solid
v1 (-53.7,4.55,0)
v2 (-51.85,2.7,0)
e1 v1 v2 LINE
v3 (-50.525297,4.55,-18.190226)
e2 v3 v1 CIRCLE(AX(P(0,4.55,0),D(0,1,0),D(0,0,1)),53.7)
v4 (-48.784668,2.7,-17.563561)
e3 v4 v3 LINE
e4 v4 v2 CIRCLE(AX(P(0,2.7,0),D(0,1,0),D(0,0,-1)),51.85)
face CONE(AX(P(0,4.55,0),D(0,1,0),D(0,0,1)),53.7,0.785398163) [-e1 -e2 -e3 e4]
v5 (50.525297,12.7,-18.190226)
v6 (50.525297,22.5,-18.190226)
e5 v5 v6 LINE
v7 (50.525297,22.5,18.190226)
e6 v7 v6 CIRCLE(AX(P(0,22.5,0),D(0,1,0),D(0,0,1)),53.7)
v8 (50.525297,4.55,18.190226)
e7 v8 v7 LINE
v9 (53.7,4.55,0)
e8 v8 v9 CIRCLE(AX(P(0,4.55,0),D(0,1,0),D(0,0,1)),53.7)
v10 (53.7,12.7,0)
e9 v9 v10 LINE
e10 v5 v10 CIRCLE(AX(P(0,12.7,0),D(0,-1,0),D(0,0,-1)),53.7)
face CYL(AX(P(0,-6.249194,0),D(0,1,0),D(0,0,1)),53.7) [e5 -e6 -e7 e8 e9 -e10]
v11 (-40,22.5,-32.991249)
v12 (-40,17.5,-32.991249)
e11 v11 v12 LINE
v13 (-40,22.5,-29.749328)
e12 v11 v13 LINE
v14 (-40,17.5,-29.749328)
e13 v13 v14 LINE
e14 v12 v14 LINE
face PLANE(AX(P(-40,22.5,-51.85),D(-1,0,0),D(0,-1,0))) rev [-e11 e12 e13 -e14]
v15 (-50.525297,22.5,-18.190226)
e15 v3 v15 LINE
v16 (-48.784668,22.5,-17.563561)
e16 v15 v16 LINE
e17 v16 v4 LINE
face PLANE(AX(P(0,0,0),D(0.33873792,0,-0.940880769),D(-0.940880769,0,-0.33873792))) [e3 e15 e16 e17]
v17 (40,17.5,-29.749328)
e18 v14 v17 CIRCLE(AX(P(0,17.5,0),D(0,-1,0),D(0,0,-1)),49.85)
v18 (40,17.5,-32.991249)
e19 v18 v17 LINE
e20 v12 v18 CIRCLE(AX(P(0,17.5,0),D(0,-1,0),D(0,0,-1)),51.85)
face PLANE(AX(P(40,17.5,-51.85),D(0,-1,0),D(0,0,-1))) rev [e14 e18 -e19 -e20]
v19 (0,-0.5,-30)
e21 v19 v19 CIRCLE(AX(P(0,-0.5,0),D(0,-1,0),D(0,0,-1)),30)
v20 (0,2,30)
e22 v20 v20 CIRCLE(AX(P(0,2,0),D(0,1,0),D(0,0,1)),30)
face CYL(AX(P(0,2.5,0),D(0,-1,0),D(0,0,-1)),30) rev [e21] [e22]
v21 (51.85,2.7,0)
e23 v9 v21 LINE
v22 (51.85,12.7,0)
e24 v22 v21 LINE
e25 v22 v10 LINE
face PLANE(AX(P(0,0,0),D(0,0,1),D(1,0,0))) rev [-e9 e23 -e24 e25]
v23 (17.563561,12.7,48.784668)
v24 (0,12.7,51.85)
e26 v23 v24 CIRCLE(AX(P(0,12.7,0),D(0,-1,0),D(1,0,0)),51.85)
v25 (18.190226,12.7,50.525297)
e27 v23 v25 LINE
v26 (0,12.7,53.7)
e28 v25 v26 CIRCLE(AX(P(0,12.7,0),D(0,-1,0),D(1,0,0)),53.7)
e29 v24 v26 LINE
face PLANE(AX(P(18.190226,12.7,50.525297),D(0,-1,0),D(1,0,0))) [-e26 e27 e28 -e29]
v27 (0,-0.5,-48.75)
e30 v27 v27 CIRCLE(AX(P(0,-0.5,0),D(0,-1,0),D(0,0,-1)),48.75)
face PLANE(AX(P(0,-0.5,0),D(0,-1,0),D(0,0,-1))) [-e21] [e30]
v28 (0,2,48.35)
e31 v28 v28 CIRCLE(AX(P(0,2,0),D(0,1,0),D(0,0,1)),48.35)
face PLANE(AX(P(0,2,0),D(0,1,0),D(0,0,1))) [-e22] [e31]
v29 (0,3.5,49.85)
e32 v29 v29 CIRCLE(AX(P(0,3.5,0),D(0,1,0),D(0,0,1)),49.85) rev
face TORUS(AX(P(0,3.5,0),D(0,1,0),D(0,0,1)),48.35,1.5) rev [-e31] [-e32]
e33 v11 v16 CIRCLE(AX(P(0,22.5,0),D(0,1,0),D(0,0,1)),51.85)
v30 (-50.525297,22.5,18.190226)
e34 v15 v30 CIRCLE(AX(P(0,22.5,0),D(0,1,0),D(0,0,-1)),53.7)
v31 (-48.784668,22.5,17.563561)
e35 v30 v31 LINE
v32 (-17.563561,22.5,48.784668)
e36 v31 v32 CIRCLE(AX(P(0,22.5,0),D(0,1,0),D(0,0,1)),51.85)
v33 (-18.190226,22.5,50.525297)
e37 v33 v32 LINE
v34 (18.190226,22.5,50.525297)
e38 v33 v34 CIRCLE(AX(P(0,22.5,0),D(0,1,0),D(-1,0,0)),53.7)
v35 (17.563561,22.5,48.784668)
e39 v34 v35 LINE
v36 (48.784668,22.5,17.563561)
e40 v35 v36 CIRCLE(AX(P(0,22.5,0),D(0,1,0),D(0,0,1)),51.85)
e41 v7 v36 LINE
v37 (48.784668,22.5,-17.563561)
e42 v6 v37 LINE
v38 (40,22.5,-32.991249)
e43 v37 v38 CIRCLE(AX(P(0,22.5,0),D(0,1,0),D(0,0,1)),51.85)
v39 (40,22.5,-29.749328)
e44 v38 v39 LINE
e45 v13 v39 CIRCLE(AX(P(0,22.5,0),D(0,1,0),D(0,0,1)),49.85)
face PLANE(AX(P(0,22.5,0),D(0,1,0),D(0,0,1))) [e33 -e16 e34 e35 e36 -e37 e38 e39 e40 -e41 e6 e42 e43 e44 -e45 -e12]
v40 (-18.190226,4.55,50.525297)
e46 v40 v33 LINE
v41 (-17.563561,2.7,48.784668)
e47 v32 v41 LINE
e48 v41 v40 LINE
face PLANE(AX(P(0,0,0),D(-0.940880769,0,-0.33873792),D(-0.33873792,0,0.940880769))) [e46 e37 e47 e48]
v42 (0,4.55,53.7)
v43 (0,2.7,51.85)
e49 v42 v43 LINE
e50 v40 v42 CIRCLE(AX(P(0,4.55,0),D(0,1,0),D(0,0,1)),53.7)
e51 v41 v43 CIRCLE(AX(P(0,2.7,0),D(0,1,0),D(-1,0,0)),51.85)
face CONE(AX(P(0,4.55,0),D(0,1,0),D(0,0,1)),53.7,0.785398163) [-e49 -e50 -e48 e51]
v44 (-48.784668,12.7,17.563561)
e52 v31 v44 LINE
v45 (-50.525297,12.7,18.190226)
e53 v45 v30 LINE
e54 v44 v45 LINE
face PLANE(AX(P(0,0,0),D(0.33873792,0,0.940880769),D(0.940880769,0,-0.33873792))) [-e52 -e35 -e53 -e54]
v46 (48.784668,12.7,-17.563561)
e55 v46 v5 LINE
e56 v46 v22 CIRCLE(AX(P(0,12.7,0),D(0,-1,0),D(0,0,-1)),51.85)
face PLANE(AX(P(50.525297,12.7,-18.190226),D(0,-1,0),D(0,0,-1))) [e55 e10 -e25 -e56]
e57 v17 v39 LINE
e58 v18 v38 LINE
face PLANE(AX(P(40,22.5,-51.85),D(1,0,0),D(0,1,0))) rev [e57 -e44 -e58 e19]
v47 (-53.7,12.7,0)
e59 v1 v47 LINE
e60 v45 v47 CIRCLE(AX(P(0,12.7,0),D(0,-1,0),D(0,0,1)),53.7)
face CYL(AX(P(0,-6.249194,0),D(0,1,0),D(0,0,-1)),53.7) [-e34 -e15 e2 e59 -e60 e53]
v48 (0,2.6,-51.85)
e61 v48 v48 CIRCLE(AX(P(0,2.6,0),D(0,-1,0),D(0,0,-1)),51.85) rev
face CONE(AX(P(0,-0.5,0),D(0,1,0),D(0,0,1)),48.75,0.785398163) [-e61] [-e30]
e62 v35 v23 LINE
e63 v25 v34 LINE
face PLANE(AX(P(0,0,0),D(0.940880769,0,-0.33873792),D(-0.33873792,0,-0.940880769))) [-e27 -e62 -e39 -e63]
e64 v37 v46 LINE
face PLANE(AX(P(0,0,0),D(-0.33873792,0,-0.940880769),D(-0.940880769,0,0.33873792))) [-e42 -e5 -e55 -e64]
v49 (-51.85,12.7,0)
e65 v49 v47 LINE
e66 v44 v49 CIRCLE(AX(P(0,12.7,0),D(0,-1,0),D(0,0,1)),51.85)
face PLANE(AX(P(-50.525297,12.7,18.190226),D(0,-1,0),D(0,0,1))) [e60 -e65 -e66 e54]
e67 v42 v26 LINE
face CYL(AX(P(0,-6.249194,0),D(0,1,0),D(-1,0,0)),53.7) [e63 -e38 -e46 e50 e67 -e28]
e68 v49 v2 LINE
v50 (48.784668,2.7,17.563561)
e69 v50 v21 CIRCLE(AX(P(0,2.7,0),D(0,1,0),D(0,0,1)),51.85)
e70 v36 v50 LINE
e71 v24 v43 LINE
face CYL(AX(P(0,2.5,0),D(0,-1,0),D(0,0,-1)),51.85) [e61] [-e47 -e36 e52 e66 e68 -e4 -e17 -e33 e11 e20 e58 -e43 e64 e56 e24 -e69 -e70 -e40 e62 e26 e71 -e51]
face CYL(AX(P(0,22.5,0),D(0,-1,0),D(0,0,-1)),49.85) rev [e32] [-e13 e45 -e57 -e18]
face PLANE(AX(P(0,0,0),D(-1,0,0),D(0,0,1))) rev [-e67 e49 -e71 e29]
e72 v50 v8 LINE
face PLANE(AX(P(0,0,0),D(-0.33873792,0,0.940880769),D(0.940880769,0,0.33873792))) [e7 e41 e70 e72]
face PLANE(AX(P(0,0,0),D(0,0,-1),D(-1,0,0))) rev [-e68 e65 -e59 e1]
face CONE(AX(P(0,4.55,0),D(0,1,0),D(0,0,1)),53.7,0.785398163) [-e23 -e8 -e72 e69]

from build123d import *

# Parameters (mm, degrees)
SKETCH1_R           = 51.85
SKETCH1_R_2         = 30
BOSS_EXTRUDE1_DEPTH = 2.5
SKETCH2_R           = 51.85
SKETCH2_R_2         = 49.85
BOSS_EXTRUDE2_DEPTH = 20
SKETCH3_W           = 1.85
SKETCH3_H           = 19.8
REVOLVE1_ANGLE      = 19.8
SKETCH4_W           = 1.85
SKETCH4_H           = 9.8
REVOLVE2_ANGLE      = 19.8
CIRPATTERN1_COUNT   = 3
CIRPATTERN1_ANGLE   = 180
SKETCH5_W           = 80
SKETCH5_H           = 5
CUT_EXTRUDE1_DEPTH  = 80.206249753
BOSS_EXTRUDE3_START = 0.5
SKETCH6_R           = 51.85
SKETCH6_R_2         = 30
BOSS_EXTRUDE3_DEPTH = 0.5
CUT_EXTRUDE2_START  = -0.5
SKETCH7_R           = 49.85
SKETCH7_R_2         = 30
CUT_EXTRUDE2_DEPTH  = 0.5
FILLET1_R           = 1.5
CHAMFER1_SIZE       = 3.1
CHAMFER2_SIZE       = 1.85


with BuildPart() as part:
    # Sketch1 → Boss-Extrude1 (new body)
    with BuildSketch(Plane(origin=(0, 0, 0), x_dir=(1, 0, 0), z_dir=(0, 1, 0))):
        with Locations(Location((0, 0, 0), (0, 0, 270))):
            Circle(SKETCH1_R)
        with Locations(Location((0, 0, 0), (0, 0, 270))):
            Circle(SKETCH1_R_2, mode=Mode.SUBTRACT)
    extrude(amount=BOSS_EXTRUDE1_DEPTH)

    # Sketch2 → Boss-Extrude2 (add)
    with BuildSketch(Plane(origin=(0, 2.5, 0), x_dir=(1, 0, 0), z_dir=(0, 1, 0))):
        with Locations(Location((0, 0, 0), (0, 0, 270))):
            Circle(SKETCH2_R)
        with Locations(Location((0, 0, 0), (0, 0, 270))):
            Circle(SKETCH2_R_2, mode=Mode.SUBTRACT)
    extrude(amount=BOSS_EXTRUDE2_DEPTH)

    # Sketch3 → Revolve1 (revolve)
    with BuildSketch(Plane.XY):
        with Locations((52.775, 12.6)):
            Rectangle(SKETCH3_W, SKETCH3_H)
    revolve1 = revolve(axis=Axis((0, -6.249194118, 0), (0, -1, 0)), revolution_arc=REVOLVE1_ANGLE)

    # Sketch4 → Revolve2 (revolve)
    with BuildSketch(Plane.XY):
        with Locations((52.775, 17.6)):
            Rectangle(SKETCH4_W, SKETCH4_H)
    revolve2 = revolve(axis=Axis((0, 0, 0), (0, 1, 0)), revolution_arc=REVOLVE2_ANGLE)

    # CirPattern1: Revolve1, Revolve2 ×3 about axis
    cirpattern1_axis = Axis((0, 22.5, 0), (0, -1, 0))
    add([revolve1.rotate(cirpattern1_axis, i * CIRPATTERN1_ANGLE / (CIRPATTERN1_COUNT - 1)) for i in range(1, CIRPATTERN1_COUNT)])
    add([revolve2.rotate(cirpattern1_axis, i * CIRPATTERN1_ANGLE / (CIRPATTERN1_COUNT - 1)) for i in range(1, CIRPATTERN1_COUNT)])

    # Sketch5 → Cut-Extrude1 (cut, through all)
    with BuildSketch(Plane.XY):
        with Locations((0, 20)):
            Rectangle(SKETCH5_W, SKETCH5_H)
    extrude(amount=-CUT_EXTRUDE1_DEPTH, mode=Mode.SUBTRACT)

    # Sketch6 → Boss-Extrude3 (add)
    with BuildSketch(Plane.XZ.offset(BOSS_EXTRUDE3_START)):
        with Locations(Location((0, 0, 0), (0, 0, 270))):
            Circle(SKETCH6_R)
        with Locations(Location((0, 0, 0), (0, 0, 270))):
            Circle(SKETCH6_R_2, mode=Mode.SUBTRACT)
    extrude(amount=-BOSS_EXTRUDE3_DEPTH)

    # Sketch7 → Cut-Extrude2 (cut)
    with BuildSketch(Plane(origin=(0, 2.5, 0), x_dir=(1, 0, 0), z_dir=(0, 1, 0)).offset(CUT_EXTRUDE2_START)):
        with Locations(Location((0, 0, 0), (0, 0, 143.360593864))):
            Circle(SKETCH7_R)
        with Locations(Location((0, 0, 0), (0, 0, 90))):
            Circle(SKETCH7_R_2, mode=Mode.SUBTRACT)
    extrude(amount=CUT_EXTRUDE2_DEPTH, mode=Mode.SUBTRACT)

    # Fillet1
    fillet1_edges = [part.edges().sort_by_distance(p)[0] for p in [
        (40, 2, 29.749327724),
    ]]
    fillet(fillet1_edges, radius=FILLET1_R)

    # Chamfer1
    chamfer1_edges = [part.edges().sort_by_distance(p)[0] for p in [
        (0, -0.5, 51.85),
    ]]
    chamfer(chamfer1_edges, length=CHAMFER1_SIZE)

    # Chamfer2
    chamfer2_edges = [part.edges().sort_by_distance(p)[0] for p in [
        (-9.232592685, 2.7, 52.900370815),
        (52.900370815, 2.7, 9.232592685),
        (-52.900370815, 2.7, -9.232592685),
    ]]
    chamfer(chamfer2_edges, length=CHAMFER2_SIZE - 0.0001)  # a hair under: the kernel refuses the full size


solid = part.part
